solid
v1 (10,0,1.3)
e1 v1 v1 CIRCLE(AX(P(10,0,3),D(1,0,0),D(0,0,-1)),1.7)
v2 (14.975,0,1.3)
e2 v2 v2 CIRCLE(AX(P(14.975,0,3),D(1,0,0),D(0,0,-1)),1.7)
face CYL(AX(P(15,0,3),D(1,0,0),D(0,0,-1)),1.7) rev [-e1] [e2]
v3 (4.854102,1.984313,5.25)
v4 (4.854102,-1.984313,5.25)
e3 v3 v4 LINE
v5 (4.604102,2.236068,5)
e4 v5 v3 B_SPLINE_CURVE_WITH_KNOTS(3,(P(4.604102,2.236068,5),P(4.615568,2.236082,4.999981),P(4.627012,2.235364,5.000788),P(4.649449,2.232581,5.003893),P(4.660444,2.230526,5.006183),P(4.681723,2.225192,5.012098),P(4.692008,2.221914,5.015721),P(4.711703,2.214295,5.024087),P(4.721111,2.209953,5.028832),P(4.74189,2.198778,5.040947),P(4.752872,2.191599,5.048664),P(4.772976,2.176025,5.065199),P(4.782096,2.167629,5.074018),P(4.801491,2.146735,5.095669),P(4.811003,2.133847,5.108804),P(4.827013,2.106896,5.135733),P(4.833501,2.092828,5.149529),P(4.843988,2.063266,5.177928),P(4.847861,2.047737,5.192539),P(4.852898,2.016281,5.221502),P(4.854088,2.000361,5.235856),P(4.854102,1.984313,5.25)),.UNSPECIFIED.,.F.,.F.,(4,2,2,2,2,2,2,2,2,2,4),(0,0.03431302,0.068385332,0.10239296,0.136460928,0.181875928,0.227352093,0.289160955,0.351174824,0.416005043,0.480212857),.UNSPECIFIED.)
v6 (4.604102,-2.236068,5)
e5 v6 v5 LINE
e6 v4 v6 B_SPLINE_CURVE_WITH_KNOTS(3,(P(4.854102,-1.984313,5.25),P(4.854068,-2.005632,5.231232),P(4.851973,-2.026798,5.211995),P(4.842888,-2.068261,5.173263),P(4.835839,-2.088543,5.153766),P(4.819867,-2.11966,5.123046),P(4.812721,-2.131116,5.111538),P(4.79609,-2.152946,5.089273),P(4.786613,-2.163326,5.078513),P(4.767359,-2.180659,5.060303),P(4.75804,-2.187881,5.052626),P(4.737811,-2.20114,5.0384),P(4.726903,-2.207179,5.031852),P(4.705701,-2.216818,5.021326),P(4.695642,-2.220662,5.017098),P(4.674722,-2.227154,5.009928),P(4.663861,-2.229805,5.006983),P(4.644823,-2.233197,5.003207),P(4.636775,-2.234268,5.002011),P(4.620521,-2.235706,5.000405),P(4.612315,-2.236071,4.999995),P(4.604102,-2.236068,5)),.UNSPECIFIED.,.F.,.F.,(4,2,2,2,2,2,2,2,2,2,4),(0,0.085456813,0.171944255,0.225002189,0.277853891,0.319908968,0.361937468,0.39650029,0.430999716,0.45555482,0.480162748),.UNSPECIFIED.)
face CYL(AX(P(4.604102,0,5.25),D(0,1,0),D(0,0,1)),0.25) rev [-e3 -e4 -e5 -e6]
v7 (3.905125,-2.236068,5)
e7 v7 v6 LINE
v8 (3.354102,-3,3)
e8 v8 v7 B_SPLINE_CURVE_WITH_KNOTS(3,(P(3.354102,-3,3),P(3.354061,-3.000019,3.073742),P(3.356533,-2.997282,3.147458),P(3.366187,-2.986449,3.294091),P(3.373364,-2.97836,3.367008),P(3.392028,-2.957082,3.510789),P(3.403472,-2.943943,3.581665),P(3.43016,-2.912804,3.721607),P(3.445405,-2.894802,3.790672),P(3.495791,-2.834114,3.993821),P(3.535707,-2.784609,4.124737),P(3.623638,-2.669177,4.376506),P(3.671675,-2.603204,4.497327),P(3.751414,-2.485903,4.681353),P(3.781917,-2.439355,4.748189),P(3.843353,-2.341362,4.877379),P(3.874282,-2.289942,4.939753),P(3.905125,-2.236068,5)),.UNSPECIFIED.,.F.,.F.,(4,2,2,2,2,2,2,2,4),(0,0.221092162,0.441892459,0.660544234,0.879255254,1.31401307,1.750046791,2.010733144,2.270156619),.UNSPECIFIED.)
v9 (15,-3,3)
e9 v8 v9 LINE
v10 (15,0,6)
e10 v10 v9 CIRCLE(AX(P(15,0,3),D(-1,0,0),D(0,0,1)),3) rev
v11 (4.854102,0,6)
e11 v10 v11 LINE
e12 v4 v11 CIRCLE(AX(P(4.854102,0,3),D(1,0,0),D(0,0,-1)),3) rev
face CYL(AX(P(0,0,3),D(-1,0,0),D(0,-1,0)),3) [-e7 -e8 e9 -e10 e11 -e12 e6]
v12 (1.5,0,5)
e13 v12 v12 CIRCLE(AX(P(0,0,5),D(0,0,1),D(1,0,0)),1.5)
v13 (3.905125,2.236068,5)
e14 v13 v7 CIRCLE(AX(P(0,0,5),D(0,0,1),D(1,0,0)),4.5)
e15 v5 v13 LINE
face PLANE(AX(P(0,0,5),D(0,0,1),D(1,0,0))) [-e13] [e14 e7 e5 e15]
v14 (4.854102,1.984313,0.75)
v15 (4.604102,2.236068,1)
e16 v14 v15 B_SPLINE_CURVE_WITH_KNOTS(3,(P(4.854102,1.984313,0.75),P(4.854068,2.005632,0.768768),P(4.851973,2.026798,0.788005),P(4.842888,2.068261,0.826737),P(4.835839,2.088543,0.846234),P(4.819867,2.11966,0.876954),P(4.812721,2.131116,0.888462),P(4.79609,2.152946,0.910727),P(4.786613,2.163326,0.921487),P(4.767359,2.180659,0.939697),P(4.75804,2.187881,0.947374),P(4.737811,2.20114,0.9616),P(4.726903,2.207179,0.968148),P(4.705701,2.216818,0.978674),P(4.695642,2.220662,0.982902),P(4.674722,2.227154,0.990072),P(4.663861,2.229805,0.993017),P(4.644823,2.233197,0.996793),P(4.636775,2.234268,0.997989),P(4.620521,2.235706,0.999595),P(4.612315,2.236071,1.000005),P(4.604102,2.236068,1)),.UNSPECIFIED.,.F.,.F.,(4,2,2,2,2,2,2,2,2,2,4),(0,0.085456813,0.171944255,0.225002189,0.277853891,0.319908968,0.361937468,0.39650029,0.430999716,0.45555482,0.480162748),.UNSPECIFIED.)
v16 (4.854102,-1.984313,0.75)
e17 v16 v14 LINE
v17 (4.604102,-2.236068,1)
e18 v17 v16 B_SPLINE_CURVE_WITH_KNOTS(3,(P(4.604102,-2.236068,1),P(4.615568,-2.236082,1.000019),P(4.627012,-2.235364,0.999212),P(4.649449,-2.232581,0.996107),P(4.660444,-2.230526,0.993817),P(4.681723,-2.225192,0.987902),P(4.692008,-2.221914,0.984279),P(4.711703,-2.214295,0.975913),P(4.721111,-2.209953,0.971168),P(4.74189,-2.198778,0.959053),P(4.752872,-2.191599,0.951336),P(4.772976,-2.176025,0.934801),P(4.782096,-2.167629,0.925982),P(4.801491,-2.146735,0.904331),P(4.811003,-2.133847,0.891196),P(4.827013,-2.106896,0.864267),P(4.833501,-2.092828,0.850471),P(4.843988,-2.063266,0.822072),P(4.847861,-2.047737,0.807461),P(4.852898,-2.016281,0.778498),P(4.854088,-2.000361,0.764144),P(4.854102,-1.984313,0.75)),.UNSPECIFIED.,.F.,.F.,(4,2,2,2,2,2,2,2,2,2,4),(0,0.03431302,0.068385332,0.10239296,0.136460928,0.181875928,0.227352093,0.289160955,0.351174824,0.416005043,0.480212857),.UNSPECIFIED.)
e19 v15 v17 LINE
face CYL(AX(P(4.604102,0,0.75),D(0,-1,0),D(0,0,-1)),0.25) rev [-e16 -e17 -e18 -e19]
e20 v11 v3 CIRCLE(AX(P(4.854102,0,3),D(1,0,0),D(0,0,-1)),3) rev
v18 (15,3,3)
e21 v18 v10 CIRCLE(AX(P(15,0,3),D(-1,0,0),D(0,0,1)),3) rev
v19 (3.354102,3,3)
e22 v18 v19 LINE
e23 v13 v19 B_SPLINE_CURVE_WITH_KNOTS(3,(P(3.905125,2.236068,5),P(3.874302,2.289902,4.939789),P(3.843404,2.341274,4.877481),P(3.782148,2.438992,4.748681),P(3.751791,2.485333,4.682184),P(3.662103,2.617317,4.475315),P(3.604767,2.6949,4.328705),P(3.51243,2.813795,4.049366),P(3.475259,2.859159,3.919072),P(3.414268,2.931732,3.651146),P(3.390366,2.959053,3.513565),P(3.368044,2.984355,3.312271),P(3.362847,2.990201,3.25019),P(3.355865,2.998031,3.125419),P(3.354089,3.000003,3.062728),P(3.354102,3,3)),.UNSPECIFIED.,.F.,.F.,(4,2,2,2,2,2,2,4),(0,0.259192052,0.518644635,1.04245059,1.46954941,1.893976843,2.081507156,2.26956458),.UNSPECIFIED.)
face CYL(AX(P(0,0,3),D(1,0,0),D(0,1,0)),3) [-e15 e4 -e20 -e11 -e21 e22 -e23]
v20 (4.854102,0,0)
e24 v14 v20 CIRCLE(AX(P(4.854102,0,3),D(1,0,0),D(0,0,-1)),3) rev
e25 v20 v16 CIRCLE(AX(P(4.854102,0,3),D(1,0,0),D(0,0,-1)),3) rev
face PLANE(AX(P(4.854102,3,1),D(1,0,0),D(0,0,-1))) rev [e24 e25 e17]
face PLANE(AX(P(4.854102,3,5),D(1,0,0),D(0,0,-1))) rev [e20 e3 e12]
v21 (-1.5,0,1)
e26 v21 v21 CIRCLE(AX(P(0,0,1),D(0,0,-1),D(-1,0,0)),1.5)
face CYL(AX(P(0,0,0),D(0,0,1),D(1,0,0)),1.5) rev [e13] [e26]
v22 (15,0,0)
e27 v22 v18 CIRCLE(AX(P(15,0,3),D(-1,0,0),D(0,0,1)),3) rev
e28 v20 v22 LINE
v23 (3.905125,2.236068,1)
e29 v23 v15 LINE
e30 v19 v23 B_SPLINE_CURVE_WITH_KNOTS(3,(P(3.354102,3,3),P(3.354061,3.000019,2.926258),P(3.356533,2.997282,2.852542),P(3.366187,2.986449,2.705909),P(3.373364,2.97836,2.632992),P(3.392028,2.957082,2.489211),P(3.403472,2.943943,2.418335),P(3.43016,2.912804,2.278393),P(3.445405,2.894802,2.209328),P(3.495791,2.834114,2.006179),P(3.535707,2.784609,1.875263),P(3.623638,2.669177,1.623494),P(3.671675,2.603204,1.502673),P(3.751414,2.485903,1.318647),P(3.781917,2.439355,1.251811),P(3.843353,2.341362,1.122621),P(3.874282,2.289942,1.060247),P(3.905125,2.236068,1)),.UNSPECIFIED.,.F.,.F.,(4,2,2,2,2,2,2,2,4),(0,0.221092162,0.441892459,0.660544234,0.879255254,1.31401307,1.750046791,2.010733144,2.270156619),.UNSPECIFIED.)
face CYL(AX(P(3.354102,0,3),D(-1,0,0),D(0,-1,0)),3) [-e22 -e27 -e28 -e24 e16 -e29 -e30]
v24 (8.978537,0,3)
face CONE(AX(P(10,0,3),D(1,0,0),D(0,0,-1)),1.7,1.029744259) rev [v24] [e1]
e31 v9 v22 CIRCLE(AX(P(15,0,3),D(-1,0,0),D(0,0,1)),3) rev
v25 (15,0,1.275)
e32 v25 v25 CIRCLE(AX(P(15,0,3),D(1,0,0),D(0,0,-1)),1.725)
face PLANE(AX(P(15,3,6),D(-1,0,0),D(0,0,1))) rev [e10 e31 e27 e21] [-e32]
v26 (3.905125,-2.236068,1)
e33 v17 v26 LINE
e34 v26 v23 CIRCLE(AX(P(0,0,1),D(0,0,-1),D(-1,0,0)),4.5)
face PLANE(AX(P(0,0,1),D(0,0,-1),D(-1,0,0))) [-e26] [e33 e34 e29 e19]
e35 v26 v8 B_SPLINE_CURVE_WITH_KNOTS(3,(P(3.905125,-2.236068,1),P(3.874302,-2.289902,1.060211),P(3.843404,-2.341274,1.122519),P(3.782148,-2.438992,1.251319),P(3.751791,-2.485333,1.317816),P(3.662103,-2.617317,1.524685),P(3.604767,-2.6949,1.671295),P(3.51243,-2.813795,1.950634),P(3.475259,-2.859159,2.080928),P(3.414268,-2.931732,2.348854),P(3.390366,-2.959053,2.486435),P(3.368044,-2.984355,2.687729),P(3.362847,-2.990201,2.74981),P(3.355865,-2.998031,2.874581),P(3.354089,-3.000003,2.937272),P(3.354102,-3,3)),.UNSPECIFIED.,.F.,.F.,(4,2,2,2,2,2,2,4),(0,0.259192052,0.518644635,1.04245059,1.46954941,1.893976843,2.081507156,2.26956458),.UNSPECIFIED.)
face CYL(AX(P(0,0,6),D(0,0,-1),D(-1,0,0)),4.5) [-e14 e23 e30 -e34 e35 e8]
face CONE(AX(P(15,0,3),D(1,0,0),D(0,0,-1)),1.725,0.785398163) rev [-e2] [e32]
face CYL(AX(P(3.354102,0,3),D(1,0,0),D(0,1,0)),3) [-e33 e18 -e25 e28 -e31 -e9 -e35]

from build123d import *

# Parameters (mm, degrees)
BOSS_EXTRU_2_DEPTH         = 6
ENL_V_START                = -1
ENL_V_MAT_EXTRU_1_DEPTH    = 1
ENL_V_MAT_EXTRU_2_DEPTH    = 1
CONG_4_R                   = 3
CONG_5_R                   = 0.25
D_GAGEMENT_M31_D           = 3.4
D_GAGEMENT_M31_DEPTH       = 5
D_GAGEMENT_M31_CSINK_D     = 3.45
D_GAGEMENT_M31_CSINK_ANGLE = 90
D_GAGEMENT_M31_TIP         = 1.021463052
ESQUISSE9_R                = 1.5
ENL_V_MAT_EXTRU_3_DEPTH    = 17.439282372


with BuildPart() as part:
    # Esquisse1 → Boss.-Extru.2 (new body)
    with BuildSketch(Plane.XY):
        with BuildLine():
            Line((3.354101966, 3), (15, 3))
            Line((15, 3), (15, -3))
            Line((15, -3), (3.354101966, -3))
            ThreePointArc((3.354101966, -3), (-4.5, 0), (3.354101966, 3))
        make_face()
    extrude(amount=BOSS_EXTRU_2_DEPTH)

    # Esquisse5 → Enlèv. mat.-Extru.1 (cut)
    with BuildSketch(Plane.XY.offset(6).offset(ENL_V_START)):
        with BuildLine():
            Line((3.354101966, 3), (4.854101966, 3))
            Line((4.854101966, 3), (4.854101966, -3))
            Line((4.854101966, -3), (3.354101966, -3))
            ThreePointArc((3.354101966, -3), (-4.5, 0), (3.354101966, 3))
        make_face()
    extrude(amount=ENL_V_MAT_EXTRU_1_DEPTH, mode=Mode.SUBTRACT)

    # Esquisse6 → Enlèv. mat.-Extru.2 (cut)
    with BuildSketch(Plane(origin=(0, 0, 0), x_dir=(-1, 0, 0), z_dir=(0, 0, -1))):
        with BuildLine():
            Line((-3.354101966, 3), (-4.854101966, 3))
            Line((-4.854101966, 3), (-4.854101966, -3))
            Line((-4.854101966, -3), (-3.354101966, -3))
            ThreePointArc((-3.354101966, -3), (4.5, 0), (-3.354101966, 3))
        make_face()
    extrude(amount=-ENL_V_MAT_EXTRU_2_DEPTH, mode=Mode.SUBTRACT)

    # Congé4
    # the kernel refuses this fillet: 3 mm, written as the material it takes off along each edge
    with BuildSketch(Plane(origin=(22.5, -3, 6), x_dir=(0, 1, 0), z_dir=(-1, 0, 0))) as cong_4_piece_1_section:
        with BuildLine():
            CenterArc((CONG_4_R, CONG_4_R), CONG_4_R, 180, 90)
            Line((0, CONG_4_R), (0, 0))
            Line((0, 0), (CONG_4_R, 0))
        make_face()
    cong_4_piece_1 = extrude(amount=25.145898034, mode=Mode.PRIVATE)
    cong_4_piece_1 = cong_4_piece_1 - Plane(origin=(0, 0, 5.599963302), x_dir=(0.7453559924999289, -0.6666666666666679, 0), z_dir=(0, 0, -1)) * Cylinder(4.5, 63, mode=Mode.PRIVATE)
    add(cong_4_piece_1, mode=Mode.SUBTRACT)
    with BuildSketch(Plane(origin=(22.5, -3, 0), x_dir=(0, 1, 0), z_dir=(-1, 0, 0))) as cong_4_piece_2_section:
        with BuildLine():
            CenterArc((CONG_4_R, -CONG_4_R), CONG_4_R, 90, 90)
            Line((0, -CONG_4_R), (0, 0))
            Line((0, 0), (CONG_4_R, 0))
        make_face()
    cong_4_piece_2 = extrude(amount=25.145898034, mode=Mode.PRIVATE)
    cong_4_piece_2 = cong_4_piece_2 - Plane(origin=(0, 0, 0.400036698), x_dir=(0.7453559924999289, -0.6666666666666679, 0), z_dir=(0, 0, -1)) * Cylinder(4.5, 63, mode=Mode.PRIVATE)
    add(cong_4_piece_2, mode=Mode.SUBTRACT)
    with BuildSketch(Plane(origin=(-2.645898034, 3, 0), x_dir=(0, 0, 1), z_dir=(1, 0, 0))) as cong_4_piece_3_section:
        with BuildLine():
            CenterArc((CONG_4_R, CONG_4_R), CONG_4_R, 180, 90)
            Line((0, CONG_4_R), (0, 0))
            Line((0, 0), (CONG_4_R, 0))
        make_face()
    cong_4_piece_3 = extrude(amount=25.145898034, mode=Mode.PRIVATE)
    cong_4_piece_3 = cong_4_piece_3 - Plane(origin=(0, 0, 1.508382446), x_dir=(0.7453559924999289, -0.6666666666666679, 0), z_dir=(0, 0, -1)) * Cylinder(4.5, 63, mode=Mode.PRIVATE)
    add(cong_4_piece_3, mode=Mode.SUBTRACT)
    with BuildSketch(Plane(origin=(-2.645898034, 3, 6), x_dir=(0, 0, -1), z_dir=(1, 0, 0))) as cong_4_piece_4_section:
        with BuildLine():
            CenterArc((CONG_4_R, -CONG_4_R), CONG_4_R, 90, 90)
            Line((0, -CONG_4_R), (0, 0))
            Line((0, 0), (CONG_4_R, 0))
        make_face()
    cong_4_piece_4 = extrude(amount=25.145898034, mode=Mode.PRIVATE)
    cong_4_piece_4 = cong_4_piece_4 - Plane(origin=(0, 0, 4.491617554), x_dir=(0.7453559924999289, -0.6666666666666679, 0), z_dir=(0, 0, -1)) * Cylinder(4.5, 63, mode=Mode.PRIVATE)
    add(cong_4_piece_4, mode=Mode.SUBTRACT)

    # Congé5
    cong_5_edges = [part.edges().sort_by_distance(p)[0] for p in [
        (4.854101966, 0, 5),
        (4.854101966, 0, 1),
    ]]
    fillet(cong_5_edges, radius=CONG_5_R)

    # Dégagement M31
    with Locations(Plane(origin=(15, 0, 0), x_dir=(0, 0, -1), z_dir=(1, 0, 0))):
        with Locations((-3, 0)):
            CounterSinkHole(D_GAGEMENT_M31_D / 2, D_GAGEMENT_M31_CSINK_D / 2, depth=D_GAGEMENT_M31_DEPTH, counter_sink_angle=D_GAGEMENT_M31_CSINK_ANGLE)
            with Locations((0, 0, -(D_GAGEMENT_M31_DEPTH + D_GAGEMENT_M31_TIP / 2))):  # 118° drill point
                Cone(0, D_GAGEMENT_M31_D / 2, D_GAGEMENT_M31_TIP, mode=Mode.SUBTRACT)

    # Esquisse9 → Enlèv. mat.-Extru.3 (cut, through all)
    with BuildSketch(Plane.XY.offset(5)):
        Circle(ESQUISSE9_R)
    extrude(amount=-ENL_V_MAT_EXTRU_3_DEPTH, mode=Mode.SUBTRACT)


solid = part.part
